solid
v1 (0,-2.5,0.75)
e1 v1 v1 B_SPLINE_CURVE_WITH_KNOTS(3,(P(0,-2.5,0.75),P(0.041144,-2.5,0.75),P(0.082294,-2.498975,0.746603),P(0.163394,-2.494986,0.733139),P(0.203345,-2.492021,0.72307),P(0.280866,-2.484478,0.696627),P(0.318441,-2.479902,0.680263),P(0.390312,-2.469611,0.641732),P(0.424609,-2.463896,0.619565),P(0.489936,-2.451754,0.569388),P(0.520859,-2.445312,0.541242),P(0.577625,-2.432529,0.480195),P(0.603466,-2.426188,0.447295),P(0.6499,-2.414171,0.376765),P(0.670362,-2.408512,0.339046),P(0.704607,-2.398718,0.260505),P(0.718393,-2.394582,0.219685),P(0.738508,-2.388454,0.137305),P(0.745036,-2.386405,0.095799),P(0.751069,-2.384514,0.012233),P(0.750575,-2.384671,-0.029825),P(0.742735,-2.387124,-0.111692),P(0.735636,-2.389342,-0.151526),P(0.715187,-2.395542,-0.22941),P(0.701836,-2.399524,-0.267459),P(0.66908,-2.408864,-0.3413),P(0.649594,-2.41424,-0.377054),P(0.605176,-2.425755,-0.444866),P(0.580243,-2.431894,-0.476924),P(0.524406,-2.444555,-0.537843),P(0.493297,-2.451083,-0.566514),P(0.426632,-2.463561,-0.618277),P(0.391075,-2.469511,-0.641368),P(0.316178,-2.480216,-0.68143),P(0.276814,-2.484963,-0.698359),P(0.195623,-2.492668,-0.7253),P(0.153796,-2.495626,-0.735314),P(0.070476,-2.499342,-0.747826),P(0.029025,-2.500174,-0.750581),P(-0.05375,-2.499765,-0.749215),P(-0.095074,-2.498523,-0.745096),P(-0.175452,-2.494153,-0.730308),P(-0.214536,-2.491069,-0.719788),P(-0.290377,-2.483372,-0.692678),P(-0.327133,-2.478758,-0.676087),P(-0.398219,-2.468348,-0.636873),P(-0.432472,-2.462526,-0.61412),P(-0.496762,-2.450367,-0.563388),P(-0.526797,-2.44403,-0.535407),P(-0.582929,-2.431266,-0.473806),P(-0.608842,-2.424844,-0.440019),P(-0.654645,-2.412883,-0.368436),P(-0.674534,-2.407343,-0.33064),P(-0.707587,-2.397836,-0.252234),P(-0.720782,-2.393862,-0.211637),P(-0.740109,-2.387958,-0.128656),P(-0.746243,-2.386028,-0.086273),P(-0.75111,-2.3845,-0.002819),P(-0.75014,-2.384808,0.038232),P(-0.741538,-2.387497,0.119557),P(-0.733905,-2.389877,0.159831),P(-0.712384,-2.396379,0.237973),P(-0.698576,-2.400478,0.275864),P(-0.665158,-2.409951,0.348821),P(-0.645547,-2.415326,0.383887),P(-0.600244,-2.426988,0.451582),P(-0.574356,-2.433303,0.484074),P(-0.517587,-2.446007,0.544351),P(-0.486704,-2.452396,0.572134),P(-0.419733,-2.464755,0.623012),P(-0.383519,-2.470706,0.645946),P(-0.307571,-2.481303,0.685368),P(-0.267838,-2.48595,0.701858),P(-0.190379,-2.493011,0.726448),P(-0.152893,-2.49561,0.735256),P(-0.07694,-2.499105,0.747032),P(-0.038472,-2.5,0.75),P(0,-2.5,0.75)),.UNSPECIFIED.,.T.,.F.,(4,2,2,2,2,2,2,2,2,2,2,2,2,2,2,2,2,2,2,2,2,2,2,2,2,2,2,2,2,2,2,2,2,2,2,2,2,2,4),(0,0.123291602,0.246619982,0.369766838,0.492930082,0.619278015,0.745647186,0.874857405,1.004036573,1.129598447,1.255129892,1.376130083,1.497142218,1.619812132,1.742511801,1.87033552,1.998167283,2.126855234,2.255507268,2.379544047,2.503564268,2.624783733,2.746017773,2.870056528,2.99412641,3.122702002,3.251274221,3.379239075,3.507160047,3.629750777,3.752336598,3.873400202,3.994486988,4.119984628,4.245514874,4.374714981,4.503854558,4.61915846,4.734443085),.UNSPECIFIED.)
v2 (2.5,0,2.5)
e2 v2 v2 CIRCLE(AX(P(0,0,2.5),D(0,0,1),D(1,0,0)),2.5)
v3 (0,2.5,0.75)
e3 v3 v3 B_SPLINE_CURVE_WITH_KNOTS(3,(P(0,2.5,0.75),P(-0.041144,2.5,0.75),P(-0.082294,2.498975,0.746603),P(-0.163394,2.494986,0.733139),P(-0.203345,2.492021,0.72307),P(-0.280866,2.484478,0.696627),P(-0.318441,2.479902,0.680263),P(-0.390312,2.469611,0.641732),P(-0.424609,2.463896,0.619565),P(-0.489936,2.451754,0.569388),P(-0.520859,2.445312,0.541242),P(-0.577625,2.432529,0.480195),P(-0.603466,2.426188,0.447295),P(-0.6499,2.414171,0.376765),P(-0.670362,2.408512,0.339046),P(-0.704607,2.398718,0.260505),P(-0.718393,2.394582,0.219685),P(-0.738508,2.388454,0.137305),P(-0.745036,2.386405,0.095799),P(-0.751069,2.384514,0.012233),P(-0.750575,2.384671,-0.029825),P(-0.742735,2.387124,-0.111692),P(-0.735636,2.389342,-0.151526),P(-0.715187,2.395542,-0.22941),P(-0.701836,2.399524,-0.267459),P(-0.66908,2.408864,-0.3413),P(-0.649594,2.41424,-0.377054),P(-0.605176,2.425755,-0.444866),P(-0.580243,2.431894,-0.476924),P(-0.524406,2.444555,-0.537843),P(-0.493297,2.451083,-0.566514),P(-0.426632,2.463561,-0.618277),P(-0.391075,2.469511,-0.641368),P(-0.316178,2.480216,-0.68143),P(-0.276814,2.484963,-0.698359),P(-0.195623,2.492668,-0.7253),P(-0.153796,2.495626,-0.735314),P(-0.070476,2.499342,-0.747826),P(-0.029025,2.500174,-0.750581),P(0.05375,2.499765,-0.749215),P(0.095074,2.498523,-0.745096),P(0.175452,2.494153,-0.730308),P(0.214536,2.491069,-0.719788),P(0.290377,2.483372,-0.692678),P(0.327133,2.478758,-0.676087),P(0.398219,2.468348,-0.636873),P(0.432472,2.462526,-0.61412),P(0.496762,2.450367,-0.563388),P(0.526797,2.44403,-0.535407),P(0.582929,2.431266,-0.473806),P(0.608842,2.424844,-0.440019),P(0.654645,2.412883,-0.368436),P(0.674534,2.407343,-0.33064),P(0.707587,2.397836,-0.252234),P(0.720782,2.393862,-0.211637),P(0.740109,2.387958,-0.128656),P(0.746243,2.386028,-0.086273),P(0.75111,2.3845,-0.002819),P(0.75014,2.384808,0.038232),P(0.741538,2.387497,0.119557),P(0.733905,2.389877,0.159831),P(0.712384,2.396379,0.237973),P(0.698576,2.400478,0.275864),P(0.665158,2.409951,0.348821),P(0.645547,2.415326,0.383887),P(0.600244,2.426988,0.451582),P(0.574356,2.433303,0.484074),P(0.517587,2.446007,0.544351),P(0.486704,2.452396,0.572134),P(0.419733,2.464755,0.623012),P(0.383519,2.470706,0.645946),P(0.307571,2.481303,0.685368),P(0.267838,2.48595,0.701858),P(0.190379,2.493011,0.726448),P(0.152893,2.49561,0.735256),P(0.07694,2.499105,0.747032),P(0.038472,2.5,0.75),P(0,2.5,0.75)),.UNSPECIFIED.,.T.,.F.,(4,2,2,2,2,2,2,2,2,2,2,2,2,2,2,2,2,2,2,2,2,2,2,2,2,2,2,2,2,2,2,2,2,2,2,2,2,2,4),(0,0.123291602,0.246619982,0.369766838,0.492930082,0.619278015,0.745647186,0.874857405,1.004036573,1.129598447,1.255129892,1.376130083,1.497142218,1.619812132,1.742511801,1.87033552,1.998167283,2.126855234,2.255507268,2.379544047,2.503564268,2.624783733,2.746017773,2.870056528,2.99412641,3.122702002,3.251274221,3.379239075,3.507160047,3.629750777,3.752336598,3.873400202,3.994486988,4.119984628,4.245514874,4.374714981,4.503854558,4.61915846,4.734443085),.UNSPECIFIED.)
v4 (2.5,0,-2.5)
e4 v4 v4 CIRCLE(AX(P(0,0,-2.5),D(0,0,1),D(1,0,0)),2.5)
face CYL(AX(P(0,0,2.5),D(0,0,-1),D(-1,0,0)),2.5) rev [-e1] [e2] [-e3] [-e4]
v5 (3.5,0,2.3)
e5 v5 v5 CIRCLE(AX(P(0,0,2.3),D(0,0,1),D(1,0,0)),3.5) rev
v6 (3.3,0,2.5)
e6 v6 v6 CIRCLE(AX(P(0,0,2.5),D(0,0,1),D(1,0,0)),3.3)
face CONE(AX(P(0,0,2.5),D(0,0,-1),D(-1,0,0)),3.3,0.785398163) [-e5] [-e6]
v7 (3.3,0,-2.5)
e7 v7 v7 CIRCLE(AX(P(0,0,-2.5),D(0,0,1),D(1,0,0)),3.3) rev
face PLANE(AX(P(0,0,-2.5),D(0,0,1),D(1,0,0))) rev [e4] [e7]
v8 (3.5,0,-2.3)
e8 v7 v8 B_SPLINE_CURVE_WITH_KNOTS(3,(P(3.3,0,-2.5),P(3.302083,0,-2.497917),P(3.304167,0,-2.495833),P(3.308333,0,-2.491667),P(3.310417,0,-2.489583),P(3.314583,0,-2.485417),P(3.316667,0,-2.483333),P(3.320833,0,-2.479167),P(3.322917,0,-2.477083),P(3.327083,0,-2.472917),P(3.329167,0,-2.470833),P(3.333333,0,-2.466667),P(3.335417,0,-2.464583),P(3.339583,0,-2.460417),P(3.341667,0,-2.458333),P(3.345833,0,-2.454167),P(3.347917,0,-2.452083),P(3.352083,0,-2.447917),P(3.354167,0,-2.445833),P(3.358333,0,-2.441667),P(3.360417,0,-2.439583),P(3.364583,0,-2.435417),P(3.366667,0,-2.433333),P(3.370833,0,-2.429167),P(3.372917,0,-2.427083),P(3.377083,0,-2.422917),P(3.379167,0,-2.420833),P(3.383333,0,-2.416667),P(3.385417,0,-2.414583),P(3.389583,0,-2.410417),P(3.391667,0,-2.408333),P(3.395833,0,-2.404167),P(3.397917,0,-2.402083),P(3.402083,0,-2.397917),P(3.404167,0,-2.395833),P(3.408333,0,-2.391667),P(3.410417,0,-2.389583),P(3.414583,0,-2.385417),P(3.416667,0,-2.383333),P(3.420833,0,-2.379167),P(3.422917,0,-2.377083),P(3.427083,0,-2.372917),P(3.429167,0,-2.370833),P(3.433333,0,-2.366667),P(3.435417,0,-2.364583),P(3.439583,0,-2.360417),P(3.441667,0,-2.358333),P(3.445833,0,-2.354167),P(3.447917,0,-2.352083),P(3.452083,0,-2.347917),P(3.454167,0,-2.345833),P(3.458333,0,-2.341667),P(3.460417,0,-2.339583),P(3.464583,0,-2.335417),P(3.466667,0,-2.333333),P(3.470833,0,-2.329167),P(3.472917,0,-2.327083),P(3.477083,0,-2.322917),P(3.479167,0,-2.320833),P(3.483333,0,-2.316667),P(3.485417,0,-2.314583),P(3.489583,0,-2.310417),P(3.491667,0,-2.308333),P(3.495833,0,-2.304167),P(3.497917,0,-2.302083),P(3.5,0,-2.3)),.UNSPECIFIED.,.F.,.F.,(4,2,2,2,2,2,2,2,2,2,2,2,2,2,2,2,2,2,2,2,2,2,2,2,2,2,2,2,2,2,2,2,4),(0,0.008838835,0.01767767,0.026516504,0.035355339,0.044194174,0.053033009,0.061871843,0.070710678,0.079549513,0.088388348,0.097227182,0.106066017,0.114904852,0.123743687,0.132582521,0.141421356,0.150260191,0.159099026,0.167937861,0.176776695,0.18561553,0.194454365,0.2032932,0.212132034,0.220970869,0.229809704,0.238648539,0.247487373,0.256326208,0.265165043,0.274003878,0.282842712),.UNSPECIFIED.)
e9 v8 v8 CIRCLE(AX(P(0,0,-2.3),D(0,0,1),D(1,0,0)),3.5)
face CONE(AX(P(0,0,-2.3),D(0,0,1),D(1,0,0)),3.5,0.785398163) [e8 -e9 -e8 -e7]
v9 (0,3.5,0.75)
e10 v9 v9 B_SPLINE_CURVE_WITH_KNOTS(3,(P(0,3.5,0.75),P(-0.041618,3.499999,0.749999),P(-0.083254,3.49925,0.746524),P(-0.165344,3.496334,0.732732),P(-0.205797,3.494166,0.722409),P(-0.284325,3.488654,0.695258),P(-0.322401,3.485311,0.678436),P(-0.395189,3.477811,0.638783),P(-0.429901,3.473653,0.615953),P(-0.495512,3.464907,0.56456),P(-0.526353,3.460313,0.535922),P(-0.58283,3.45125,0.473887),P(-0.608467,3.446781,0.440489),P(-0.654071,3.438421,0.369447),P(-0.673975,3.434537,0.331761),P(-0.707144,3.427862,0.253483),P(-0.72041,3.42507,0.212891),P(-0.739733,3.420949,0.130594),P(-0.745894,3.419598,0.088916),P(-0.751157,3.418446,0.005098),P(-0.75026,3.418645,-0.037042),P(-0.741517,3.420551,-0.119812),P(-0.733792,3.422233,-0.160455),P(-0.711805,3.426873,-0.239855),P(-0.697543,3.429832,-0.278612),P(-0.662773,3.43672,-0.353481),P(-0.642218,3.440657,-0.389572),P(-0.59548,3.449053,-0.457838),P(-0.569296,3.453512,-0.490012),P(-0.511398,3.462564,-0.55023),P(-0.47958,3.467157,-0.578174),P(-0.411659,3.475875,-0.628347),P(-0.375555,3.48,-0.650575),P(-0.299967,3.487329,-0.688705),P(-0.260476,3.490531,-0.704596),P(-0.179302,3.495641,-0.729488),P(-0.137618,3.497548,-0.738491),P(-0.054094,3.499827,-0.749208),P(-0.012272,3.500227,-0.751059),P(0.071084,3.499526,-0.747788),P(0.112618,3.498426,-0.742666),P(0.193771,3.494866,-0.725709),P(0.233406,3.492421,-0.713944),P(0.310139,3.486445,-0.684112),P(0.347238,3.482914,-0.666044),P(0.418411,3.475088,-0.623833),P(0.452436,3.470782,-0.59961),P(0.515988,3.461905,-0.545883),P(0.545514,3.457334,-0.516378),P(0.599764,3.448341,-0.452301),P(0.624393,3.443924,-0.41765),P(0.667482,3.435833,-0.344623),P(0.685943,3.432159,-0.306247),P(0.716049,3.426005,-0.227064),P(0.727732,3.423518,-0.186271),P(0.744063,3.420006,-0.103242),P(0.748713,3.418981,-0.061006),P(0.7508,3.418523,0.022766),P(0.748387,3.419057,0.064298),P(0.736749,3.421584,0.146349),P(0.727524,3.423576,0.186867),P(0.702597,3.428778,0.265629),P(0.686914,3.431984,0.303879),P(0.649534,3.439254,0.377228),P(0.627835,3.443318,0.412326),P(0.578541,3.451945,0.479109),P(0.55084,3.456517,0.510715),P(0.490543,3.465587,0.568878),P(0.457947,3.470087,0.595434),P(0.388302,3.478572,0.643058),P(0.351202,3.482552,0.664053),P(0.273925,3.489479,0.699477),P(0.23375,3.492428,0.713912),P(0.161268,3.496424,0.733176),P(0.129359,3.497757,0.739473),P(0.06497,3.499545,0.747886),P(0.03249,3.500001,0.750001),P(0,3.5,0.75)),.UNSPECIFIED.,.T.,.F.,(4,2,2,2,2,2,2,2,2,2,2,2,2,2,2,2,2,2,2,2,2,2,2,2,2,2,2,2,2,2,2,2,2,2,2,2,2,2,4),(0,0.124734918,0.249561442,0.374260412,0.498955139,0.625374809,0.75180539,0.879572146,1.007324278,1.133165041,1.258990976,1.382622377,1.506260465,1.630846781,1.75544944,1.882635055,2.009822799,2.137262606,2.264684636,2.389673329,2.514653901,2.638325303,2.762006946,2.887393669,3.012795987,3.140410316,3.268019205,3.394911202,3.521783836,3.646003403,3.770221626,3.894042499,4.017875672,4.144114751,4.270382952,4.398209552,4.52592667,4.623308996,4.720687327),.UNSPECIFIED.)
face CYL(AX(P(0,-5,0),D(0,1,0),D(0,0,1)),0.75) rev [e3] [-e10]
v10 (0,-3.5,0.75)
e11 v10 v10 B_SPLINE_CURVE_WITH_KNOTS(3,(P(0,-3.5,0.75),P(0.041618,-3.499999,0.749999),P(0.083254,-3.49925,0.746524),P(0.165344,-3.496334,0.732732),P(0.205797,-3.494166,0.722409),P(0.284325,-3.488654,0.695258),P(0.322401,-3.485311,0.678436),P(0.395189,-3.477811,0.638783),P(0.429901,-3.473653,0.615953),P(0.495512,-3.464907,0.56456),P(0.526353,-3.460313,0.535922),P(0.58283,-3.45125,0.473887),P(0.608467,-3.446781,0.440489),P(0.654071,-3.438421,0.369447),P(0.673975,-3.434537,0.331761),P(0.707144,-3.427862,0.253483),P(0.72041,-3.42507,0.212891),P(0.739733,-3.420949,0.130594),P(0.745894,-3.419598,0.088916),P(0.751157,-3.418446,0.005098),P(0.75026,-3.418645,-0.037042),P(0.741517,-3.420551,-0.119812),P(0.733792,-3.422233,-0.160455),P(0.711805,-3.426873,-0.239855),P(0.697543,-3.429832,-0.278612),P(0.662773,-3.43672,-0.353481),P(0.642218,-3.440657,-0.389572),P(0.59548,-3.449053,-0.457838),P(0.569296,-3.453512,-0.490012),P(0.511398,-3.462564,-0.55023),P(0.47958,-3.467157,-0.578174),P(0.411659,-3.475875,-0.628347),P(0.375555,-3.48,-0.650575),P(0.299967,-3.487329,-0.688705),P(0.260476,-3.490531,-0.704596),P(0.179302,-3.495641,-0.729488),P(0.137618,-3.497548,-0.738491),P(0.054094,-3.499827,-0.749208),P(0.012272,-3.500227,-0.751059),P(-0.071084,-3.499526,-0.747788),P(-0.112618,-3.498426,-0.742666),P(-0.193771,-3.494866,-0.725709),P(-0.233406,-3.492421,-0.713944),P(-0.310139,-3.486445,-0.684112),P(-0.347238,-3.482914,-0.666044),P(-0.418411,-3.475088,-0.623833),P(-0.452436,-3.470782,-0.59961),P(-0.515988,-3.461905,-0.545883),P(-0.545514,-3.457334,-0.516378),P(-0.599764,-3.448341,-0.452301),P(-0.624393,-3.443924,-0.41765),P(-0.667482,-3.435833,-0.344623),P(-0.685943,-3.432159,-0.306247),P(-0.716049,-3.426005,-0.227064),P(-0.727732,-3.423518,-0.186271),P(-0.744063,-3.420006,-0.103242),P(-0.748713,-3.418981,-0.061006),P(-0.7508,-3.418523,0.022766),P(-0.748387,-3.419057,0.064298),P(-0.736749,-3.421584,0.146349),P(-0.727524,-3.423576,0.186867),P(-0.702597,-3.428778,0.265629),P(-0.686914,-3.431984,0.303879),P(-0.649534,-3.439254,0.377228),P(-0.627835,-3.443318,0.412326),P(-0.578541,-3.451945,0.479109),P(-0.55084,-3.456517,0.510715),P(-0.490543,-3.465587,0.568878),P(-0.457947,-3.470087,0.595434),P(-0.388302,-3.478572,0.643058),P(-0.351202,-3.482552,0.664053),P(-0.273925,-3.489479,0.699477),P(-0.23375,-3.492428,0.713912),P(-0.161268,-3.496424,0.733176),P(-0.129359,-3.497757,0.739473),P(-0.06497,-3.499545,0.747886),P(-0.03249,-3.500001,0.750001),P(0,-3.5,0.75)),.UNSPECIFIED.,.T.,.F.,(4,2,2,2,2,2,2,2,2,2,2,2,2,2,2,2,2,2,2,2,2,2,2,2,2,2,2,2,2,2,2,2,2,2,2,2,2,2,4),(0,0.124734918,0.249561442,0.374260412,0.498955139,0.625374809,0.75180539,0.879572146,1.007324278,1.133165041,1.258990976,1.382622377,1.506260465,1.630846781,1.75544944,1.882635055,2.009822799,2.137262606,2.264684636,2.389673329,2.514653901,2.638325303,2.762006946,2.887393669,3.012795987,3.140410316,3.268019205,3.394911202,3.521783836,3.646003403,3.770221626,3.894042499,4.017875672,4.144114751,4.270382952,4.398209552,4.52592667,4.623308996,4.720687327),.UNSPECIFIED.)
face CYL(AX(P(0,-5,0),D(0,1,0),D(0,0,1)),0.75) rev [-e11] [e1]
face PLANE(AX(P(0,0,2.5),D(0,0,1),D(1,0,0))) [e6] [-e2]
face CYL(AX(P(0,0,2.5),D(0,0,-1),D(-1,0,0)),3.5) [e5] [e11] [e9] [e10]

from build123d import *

# Parameters (mm, degrees)
ESQUISSE1_R             = 3.5
ESQUISSE1_R_2           = 2.5
BASE_EXTRU_MINCE_DEPTH  = 2.5
CHANFREIN1_SIZE         = 0.2
ESQUISSE2_R             = 0.75
ENL_V_MAT_EXTRU_1_DEPTH = 5


with BuildPart() as part:
    # Esquisse1 → Base-Extru.-Mince (new, symmetric)
    with BuildSketch(Plane.XY):
        Circle(ESQUISSE1_R)
        Circle(ESQUISSE1_R_2, mode=Mode.SUBTRACT)
    extrude(amount=BASE_EXTRU_MINCE_DEPTH, both=True)

    # Chanfrein1
    chanfrein1_edges = [part.edges().sort_by_distance(p)[0] for p in [
        (-3.5, 0, -2.5),
        (-3.5, 0, 2.5),
    ]]
    chamfer(chanfrein1_edges, length=CHANFREIN1_SIZE)

    # Esquisse2 → Enlèv. mat.-Extru.1 (cut, symmetric)
    with BuildSketch(Plane(origin=(0, 0, 0), x_dir=(1, 0, 0), z_dir=(0, 1, 0))):
        with Locations(Location((0, 0, 0), (0, 0, 270))):
            Circle(ESQUISSE2_R)
    extrude(amount=ENL_V_MAT_EXTRU_1_DEPTH, both=True, mode=Mode.SUBTRACT)


solid = part.part
